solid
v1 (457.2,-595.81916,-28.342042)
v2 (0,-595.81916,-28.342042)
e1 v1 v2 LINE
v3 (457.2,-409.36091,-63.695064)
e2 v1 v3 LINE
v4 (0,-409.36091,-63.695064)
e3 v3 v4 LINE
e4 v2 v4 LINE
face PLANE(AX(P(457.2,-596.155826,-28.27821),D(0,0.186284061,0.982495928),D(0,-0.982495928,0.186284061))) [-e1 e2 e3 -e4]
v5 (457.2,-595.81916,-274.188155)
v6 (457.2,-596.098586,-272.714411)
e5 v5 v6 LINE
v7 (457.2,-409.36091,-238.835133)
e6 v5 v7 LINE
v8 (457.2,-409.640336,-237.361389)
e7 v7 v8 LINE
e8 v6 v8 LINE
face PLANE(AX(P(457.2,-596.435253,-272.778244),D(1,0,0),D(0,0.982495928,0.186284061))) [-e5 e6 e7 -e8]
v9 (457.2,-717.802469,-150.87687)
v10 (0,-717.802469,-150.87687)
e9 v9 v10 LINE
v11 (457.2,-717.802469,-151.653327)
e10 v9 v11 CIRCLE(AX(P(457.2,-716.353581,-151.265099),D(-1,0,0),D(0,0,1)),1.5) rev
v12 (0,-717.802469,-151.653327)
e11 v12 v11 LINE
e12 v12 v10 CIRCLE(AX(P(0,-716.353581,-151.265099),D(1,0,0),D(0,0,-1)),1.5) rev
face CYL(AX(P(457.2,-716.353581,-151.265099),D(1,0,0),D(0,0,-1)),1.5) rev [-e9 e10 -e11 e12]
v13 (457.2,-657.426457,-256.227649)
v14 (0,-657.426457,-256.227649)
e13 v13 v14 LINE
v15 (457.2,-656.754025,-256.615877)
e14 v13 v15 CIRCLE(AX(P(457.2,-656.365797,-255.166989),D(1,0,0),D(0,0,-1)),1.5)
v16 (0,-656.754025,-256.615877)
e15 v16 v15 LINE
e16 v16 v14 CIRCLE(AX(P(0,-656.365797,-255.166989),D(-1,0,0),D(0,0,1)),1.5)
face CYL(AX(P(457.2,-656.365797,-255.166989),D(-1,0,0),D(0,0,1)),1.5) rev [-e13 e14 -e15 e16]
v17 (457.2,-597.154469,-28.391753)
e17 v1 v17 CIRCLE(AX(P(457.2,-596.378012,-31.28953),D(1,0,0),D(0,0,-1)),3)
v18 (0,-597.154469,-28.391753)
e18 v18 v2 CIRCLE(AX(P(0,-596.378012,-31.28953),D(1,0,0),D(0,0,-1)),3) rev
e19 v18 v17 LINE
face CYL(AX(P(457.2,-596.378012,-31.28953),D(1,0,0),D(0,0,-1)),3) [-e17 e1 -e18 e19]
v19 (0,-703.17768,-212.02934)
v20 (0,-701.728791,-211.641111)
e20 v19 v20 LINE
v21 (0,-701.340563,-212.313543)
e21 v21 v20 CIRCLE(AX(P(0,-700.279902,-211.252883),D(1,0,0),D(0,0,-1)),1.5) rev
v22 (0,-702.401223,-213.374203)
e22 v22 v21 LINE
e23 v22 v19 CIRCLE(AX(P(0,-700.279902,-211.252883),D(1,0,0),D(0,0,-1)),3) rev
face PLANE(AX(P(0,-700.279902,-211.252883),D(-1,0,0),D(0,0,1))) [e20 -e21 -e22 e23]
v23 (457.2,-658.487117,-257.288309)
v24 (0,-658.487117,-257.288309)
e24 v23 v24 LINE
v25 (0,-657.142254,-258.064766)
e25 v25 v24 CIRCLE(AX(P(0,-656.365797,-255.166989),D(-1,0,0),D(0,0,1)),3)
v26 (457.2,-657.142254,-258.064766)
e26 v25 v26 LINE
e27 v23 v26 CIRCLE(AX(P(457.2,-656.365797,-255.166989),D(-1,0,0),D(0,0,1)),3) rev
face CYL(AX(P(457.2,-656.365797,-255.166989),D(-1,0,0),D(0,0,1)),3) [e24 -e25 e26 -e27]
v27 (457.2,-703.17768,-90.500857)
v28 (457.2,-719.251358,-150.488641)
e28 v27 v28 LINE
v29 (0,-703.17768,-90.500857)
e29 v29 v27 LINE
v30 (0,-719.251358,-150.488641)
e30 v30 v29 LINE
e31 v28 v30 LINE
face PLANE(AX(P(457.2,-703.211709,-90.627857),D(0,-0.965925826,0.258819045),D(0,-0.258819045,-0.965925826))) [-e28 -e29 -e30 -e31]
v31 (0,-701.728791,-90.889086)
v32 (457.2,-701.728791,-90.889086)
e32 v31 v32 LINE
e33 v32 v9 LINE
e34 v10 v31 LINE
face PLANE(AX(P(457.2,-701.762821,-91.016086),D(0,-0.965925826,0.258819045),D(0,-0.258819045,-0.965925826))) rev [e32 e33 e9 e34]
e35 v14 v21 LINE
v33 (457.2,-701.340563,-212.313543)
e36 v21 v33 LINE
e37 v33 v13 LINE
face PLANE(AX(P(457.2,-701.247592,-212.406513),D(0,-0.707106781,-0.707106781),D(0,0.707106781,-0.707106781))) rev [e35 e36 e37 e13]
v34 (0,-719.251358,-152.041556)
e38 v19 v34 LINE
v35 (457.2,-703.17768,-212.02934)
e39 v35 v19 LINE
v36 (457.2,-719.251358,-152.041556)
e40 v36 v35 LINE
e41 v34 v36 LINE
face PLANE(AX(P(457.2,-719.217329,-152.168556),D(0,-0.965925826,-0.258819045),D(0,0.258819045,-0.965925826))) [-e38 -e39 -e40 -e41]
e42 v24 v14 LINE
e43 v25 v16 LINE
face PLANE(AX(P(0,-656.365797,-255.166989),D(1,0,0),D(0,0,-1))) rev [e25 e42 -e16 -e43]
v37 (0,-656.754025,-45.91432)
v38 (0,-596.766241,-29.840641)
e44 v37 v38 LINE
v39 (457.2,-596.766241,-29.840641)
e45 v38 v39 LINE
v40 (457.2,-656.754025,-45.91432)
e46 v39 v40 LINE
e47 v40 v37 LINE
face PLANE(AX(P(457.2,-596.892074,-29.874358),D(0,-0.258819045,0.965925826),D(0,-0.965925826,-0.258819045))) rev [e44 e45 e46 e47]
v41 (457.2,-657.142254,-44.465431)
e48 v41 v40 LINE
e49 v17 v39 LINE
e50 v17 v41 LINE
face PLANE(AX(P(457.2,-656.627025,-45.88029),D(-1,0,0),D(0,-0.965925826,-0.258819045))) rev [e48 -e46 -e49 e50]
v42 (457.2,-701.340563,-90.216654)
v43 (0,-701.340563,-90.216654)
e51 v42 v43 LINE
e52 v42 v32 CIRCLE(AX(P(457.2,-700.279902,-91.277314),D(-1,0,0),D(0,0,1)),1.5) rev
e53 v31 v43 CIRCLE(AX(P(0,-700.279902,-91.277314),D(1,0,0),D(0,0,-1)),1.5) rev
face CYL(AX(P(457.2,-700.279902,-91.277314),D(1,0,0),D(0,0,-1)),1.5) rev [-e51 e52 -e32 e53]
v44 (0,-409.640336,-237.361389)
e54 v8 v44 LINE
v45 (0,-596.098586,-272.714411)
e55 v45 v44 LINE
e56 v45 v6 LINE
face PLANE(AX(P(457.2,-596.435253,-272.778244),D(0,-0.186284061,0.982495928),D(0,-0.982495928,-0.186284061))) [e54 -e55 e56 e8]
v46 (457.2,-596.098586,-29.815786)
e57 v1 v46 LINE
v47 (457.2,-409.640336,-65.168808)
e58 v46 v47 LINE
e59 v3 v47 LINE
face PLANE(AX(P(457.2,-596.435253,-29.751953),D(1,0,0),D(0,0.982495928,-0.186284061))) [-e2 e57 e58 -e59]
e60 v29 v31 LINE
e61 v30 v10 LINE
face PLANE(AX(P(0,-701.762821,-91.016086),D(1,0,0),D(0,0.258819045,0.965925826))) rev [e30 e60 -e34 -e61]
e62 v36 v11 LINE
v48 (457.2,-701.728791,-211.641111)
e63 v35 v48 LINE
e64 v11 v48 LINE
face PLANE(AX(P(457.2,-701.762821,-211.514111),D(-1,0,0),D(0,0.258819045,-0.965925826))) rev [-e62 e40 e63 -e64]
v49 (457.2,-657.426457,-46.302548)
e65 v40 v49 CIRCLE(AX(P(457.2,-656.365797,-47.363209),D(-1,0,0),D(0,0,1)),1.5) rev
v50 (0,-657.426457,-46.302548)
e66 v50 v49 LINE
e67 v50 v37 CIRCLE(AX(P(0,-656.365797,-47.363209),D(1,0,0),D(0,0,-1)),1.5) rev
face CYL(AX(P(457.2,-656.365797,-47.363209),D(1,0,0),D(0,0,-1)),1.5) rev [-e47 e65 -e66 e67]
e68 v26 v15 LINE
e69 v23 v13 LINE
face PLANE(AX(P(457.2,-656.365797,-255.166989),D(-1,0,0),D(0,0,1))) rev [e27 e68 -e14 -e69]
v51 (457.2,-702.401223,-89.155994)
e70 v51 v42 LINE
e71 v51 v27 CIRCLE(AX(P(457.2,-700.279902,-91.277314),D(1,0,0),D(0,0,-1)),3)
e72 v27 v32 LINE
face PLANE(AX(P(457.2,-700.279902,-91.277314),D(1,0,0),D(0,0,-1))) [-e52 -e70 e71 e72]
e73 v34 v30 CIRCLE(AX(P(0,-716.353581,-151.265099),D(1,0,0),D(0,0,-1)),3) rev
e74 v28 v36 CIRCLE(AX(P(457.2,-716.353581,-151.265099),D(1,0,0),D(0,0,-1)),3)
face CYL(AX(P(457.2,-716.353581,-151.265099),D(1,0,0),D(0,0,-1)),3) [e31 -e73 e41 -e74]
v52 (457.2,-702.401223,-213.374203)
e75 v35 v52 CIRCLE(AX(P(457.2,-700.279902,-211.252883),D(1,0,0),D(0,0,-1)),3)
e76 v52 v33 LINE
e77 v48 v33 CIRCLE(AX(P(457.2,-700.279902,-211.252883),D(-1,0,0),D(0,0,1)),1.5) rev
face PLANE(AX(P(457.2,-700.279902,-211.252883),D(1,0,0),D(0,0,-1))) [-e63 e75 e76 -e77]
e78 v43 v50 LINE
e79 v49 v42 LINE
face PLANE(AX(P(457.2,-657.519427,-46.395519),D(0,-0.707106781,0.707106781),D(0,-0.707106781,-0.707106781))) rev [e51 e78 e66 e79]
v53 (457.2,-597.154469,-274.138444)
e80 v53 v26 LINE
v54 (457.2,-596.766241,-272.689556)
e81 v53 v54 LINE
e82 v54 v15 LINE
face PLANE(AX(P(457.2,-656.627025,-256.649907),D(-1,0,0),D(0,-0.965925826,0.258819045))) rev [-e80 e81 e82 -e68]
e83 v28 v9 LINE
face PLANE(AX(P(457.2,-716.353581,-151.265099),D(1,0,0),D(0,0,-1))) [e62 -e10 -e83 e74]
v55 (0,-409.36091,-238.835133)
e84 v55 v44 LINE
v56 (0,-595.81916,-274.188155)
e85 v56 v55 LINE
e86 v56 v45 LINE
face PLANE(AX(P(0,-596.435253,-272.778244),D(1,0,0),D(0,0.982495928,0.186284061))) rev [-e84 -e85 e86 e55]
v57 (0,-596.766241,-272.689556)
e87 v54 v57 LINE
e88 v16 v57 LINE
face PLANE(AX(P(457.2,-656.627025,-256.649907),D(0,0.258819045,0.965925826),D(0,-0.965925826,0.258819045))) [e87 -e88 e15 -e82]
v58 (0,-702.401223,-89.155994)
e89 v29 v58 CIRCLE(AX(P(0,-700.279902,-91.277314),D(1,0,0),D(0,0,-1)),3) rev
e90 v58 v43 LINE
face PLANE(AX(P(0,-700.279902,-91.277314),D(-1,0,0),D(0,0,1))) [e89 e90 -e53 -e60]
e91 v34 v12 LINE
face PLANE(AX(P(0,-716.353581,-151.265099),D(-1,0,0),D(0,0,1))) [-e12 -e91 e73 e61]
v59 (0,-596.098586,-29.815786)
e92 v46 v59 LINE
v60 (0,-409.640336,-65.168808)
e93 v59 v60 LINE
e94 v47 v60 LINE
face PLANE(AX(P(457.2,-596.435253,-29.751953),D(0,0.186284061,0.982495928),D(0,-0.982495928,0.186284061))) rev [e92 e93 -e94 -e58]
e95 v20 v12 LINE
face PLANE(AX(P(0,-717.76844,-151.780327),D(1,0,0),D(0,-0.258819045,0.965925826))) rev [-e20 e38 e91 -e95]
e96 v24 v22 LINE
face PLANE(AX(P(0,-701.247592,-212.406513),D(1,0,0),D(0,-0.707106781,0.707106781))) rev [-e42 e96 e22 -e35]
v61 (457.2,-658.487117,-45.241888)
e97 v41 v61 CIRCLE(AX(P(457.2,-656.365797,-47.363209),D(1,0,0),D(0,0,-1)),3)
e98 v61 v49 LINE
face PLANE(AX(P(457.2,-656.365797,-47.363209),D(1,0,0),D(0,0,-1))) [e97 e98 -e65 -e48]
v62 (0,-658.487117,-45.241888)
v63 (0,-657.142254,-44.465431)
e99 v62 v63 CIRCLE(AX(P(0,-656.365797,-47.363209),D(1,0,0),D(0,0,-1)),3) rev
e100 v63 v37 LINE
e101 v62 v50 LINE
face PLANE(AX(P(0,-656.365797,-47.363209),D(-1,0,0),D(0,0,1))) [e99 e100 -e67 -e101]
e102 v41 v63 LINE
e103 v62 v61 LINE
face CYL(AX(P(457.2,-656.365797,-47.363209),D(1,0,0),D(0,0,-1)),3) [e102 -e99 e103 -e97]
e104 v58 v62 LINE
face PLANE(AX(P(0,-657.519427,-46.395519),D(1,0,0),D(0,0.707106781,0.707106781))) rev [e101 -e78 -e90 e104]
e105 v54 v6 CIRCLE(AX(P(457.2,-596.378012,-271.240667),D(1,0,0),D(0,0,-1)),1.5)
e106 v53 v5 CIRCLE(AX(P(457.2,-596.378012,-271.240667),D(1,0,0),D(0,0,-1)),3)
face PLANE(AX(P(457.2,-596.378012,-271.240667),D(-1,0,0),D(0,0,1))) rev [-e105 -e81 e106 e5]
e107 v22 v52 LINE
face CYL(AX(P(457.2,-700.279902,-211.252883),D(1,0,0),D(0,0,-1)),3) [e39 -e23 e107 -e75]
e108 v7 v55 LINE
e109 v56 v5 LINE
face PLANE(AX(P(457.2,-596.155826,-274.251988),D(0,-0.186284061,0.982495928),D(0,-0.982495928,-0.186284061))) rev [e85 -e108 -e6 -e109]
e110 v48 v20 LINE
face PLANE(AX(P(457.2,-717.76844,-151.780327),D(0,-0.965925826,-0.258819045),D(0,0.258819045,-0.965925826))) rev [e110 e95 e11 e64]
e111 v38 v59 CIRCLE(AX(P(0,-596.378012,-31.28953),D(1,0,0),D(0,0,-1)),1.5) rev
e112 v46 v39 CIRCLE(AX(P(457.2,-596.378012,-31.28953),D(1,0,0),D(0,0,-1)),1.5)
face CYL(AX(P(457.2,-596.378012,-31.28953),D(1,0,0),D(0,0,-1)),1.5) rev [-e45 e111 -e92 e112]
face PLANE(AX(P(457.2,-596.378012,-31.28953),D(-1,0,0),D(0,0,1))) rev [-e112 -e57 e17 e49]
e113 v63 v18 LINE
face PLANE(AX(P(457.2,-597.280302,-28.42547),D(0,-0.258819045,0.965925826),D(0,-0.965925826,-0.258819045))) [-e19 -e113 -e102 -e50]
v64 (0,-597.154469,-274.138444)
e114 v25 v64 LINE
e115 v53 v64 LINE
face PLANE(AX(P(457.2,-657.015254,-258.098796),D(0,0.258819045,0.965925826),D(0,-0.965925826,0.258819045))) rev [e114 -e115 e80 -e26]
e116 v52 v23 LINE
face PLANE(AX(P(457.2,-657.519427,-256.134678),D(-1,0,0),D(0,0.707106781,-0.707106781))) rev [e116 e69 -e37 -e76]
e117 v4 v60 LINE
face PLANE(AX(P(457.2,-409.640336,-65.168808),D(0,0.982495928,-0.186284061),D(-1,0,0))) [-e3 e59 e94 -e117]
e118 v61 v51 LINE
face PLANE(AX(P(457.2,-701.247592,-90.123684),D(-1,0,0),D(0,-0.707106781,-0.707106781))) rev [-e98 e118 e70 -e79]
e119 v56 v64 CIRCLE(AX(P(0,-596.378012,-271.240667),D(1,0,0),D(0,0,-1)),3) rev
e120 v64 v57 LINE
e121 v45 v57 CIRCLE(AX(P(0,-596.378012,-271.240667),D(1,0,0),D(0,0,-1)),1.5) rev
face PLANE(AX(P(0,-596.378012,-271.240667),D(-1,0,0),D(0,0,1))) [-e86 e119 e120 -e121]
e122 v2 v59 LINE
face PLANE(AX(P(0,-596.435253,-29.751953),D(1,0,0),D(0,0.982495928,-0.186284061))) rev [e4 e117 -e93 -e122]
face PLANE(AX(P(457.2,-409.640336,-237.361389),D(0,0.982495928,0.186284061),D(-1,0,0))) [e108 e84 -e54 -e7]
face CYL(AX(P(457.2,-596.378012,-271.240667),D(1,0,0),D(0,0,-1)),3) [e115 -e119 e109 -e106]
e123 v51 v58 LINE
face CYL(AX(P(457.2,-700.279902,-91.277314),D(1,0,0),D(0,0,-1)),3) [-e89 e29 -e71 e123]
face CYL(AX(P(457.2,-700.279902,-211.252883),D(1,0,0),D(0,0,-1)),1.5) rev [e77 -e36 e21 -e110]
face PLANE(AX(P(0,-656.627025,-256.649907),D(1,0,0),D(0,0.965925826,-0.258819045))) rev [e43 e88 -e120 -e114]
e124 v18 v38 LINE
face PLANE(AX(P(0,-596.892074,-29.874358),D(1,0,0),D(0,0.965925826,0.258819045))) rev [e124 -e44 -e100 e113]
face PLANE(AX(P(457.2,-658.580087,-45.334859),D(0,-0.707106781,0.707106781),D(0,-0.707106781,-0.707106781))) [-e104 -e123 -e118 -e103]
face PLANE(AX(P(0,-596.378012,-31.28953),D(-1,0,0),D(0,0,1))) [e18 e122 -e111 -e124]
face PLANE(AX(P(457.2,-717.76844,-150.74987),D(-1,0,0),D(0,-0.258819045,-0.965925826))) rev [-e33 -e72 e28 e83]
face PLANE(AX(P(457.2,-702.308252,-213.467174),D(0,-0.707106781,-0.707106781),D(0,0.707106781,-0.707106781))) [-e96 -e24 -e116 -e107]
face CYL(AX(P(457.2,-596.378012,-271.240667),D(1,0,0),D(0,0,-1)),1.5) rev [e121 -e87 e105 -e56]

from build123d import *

# Parameters (mm, degrees)
BOSS_EXTRUDE1_DEPTH    = 457.2
CONVERT_SOLID1_DEPTH   = 457.2
CONVERT_SOLID1_2_DEPTH = 457.2


# Read off the part's stored shape, not the designer's step: Convert-Solid1
with BuildPart() as part:
    # Sketch1 → Boss-Extrude1 (new body)
    with BuildSketch(Plane(origin=(0, 0, 0), x_dir=(0, 0, 1), z_dir=(1, 0, 0))):
        Polygon((-29.751953414, 596.435252585), (-65.16880823, 409.640335681), (-63.546707453, 409.332780696), (-28.059593886, 596.498254998), (-28.279614725, 597.319383946), (-44.285546712, 657.054335345), (-44.538099225, 657.996874156), (-45.228085523, 658.686860454), (-88.95625047, 702.415025401), (-89.646236768, 703.105011699), (-90.588775579, 703.357564213), (-150.322559758, 719.363183444), (-151.265098569, 719.615735957), (-152.20763738, 719.363183444), (-211.941421559, 703.357564213), (-212.88396037, 703.105011699), (-213.573946668, 702.415025401), (-257.302111615, 658.686860454), (-257.992097913, 657.996874156), (-258.244650426, 657.054335345), (-274.250582413, 597.319383946), (-274.470603252, 596.498254998), (-238.983489685, 409.332780696), (-237.361388908, 409.640335681), (-272.778243724, 596.435252585), (-272.655838874, 596.892073703), (-256.649906887, 656.627025102), (-256.511851808, 657.14225367), (-256.134678319, 657.519427159), (-212.406513372, 701.247592106), (-212.029339883, 701.624765595), (-211.514111315, 701.762820673), (-151.780327137, 717.768439905), (-151.265098569, 717.906494983), (-150.749870001, 717.768439905), (-91.016085823, 701.762820673), (-90.500857255, 701.624765595), (-90.123683766, 701.247592106), (-46.395518819, 657.519427159), (-46.01834533, 657.14225367), (-45.880290251, 656.627025102), (-29.874358264, 596.892073703), align=None)
    extrude(amount=BOSS_EXTRUDE1_DEPTH)

    # Convert-Solid1 outline → Convert-Solid1 (cut)
    with BuildSketch(Plane.YZ):
        with BuildLine():
            Line((-409.332780696, -238.983489685), (-409.360909589, -238.8351328))
            Line((-409.360909589, -238.8351328), (-595.819160173, -274.188154711))
            ThreePointArc((-595.819160173, -274.188154711), (-596.489617721, -274.238590248), (-597.154469491, -274.138444405))
            Line((-597.154469491, -274.138444405), (-657.14225367, -258.064766079))
            ThreePointArc((-657.14225367, -258.064766079), (-657.865796534, -257.765064811), (-658.487116878, -257.288308944))
            Line((-658.487116878, -257.288308944), (-702.40122273, -213.374203091))
            ThreePointArc((-702.40122273, -213.374203091), (-702.877978598, -212.752882748), (-703.177679865, -212.029339883))
            Line((-703.177679865, -212.029339883), (-719.251358192, -152.041555704))
            ThreePointArc((-719.251358192, -152.041555704), (-719.353580713, -151.265098569), (-719.251358192, -150.488641434))
            Line((-719.251358192, -150.488641434), (-703.177679865, -90.500857255))
            ThreePointArc((-703.177679865, -90.500857255), (-702.877978598, -89.77731439), (-702.40122273, -89.155994047))
            Line((-702.40122273, -89.155994047), (-658.487116878, -45.241888194))
            ThreePointArc((-658.487116878, -45.241888194), (-657.865796534, -44.765132327), (-657.14225367, -44.465431059))
            Line((-657.14225367, -44.465431059), (-597.154469491, -28.391752733))
            ThreePointArc((-597.154469491, -28.391752733), (-596.489617721, -28.29160689), (-595.819160173, -28.342042427))
            Line((-595.819160173, -28.342042427), (-409.360909589, -63.695064338))
            Line((-409.360909589, -63.695064338), (-409.332780696, -63.546707453))
            Line((-409.332780696, -63.546707453), (-596.498254998, -28.059593886))
            Line((-596.498254998, -28.059593886), (-657.996874156, -44.538099225))
            Line((-657.996874156, -44.538099225), (-703.105011699, -89.646236768))
            Line((-703.105011699, -89.646236768), (-719.615735957, -151.265098569))
            Line((-719.615735957, -151.265098569), (-703.105011699, -212.88396037))
            Line((-703.105011699, -212.88396037), (-657.996874156, -257.992097913))
            Line((-657.996874156, -257.992097913), (-596.498254998, -274.470603252))
            Line((-596.498254998, -274.470603252), (-409.332780696, -238.983489685))
        make_face()
    extrude(amount=CONVERT_SOLID1_DEPTH, mode=Mode.SUBTRACT)

    # Convert-Solid1 2 outline → Convert-Solid1 2 (add)
    with BuildSketch(Plane.YZ):
        with BuildLine():
            ThreePointArc((-596.098586265, -272.714410818), (-596.433815038, -272.739628587), (-596.766240923, -272.689555666))
            Line((-596.766240923, -272.689555666), (-596.435252585, -272.778243724))
            Line((-596.435252585, -272.778243724), (-596.098586265, -272.714410818))
        make_face()
        with BuildLine():
            Line((-657.14225367, -256.511851808), (-656.754025102, -256.615877339))
            ThreePointArc((-656.754025102, -256.615877339), (-657.115796534, -256.466026706), (-657.426456706, -256.227648772))
            Line((-657.426456706, -256.227648772), (-657.14225367, -256.511851808))
        make_face()
        with BuildLine():
            Line((-701.624765595, -212.029339883), (-701.340562558, -212.313542919))
            ThreePointArc((-701.340562558, -212.313542919), (-701.578940492, -212.002882747), (-701.728791126, -211.641111315))
            Line((-701.728791126, -211.641111315), (-701.624765595, -212.029339883))
        make_face()
        with BuildLine():
            Line((-717.906494983, -151.265098569), (-717.802469452, -151.653327137))
            ThreePointArc((-717.802469452, -151.653327137), (-717.853580713, -151.265098569), (-717.802469452, -150.876870001))
            Line((-717.802469452, -150.876870001), (-717.906494983, -151.265098569))
        make_face()
        with BuildLine():
            Line((-701.624765595, -90.500857255), (-701.728791126, -90.889085823))
            ThreePointArc((-701.728791126, -90.889085823), (-701.578940492, -90.527314391), (-701.340562558, -90.216654219))
            Line((-701.340562558, -90.216654219), (-701.624765595, -90.500857255))
        make_face()
        with BuildLine():
            Line((-657.14225367, -46.01834533), (-657.426456706, -46.302548366))
            ThreePointArc((-657.426456706, -46.302548366), (-657.115796534, -46.064170432), (-656.754025102, -45.914319799))
            Line((-656.754025102, -45.914319799), (-657.14225367, -46.01834533))
        make_face()
        with BuildLine():
            Line((-596.435252585, -29.751953414), (-596.766240923, -29.840641472))
            ThreePointArc((-596.766240923, -29.840641472), (-596.433815038, -29.790568551), (-596.098586265, -29.815786319))
            Line((-596.098586265, -29.815786319), (-596.435252585, -29.751953414))
        make_face()
    extrude(amount=CONVERT_SOLID1_2_DEPTH)


solid = part.part
